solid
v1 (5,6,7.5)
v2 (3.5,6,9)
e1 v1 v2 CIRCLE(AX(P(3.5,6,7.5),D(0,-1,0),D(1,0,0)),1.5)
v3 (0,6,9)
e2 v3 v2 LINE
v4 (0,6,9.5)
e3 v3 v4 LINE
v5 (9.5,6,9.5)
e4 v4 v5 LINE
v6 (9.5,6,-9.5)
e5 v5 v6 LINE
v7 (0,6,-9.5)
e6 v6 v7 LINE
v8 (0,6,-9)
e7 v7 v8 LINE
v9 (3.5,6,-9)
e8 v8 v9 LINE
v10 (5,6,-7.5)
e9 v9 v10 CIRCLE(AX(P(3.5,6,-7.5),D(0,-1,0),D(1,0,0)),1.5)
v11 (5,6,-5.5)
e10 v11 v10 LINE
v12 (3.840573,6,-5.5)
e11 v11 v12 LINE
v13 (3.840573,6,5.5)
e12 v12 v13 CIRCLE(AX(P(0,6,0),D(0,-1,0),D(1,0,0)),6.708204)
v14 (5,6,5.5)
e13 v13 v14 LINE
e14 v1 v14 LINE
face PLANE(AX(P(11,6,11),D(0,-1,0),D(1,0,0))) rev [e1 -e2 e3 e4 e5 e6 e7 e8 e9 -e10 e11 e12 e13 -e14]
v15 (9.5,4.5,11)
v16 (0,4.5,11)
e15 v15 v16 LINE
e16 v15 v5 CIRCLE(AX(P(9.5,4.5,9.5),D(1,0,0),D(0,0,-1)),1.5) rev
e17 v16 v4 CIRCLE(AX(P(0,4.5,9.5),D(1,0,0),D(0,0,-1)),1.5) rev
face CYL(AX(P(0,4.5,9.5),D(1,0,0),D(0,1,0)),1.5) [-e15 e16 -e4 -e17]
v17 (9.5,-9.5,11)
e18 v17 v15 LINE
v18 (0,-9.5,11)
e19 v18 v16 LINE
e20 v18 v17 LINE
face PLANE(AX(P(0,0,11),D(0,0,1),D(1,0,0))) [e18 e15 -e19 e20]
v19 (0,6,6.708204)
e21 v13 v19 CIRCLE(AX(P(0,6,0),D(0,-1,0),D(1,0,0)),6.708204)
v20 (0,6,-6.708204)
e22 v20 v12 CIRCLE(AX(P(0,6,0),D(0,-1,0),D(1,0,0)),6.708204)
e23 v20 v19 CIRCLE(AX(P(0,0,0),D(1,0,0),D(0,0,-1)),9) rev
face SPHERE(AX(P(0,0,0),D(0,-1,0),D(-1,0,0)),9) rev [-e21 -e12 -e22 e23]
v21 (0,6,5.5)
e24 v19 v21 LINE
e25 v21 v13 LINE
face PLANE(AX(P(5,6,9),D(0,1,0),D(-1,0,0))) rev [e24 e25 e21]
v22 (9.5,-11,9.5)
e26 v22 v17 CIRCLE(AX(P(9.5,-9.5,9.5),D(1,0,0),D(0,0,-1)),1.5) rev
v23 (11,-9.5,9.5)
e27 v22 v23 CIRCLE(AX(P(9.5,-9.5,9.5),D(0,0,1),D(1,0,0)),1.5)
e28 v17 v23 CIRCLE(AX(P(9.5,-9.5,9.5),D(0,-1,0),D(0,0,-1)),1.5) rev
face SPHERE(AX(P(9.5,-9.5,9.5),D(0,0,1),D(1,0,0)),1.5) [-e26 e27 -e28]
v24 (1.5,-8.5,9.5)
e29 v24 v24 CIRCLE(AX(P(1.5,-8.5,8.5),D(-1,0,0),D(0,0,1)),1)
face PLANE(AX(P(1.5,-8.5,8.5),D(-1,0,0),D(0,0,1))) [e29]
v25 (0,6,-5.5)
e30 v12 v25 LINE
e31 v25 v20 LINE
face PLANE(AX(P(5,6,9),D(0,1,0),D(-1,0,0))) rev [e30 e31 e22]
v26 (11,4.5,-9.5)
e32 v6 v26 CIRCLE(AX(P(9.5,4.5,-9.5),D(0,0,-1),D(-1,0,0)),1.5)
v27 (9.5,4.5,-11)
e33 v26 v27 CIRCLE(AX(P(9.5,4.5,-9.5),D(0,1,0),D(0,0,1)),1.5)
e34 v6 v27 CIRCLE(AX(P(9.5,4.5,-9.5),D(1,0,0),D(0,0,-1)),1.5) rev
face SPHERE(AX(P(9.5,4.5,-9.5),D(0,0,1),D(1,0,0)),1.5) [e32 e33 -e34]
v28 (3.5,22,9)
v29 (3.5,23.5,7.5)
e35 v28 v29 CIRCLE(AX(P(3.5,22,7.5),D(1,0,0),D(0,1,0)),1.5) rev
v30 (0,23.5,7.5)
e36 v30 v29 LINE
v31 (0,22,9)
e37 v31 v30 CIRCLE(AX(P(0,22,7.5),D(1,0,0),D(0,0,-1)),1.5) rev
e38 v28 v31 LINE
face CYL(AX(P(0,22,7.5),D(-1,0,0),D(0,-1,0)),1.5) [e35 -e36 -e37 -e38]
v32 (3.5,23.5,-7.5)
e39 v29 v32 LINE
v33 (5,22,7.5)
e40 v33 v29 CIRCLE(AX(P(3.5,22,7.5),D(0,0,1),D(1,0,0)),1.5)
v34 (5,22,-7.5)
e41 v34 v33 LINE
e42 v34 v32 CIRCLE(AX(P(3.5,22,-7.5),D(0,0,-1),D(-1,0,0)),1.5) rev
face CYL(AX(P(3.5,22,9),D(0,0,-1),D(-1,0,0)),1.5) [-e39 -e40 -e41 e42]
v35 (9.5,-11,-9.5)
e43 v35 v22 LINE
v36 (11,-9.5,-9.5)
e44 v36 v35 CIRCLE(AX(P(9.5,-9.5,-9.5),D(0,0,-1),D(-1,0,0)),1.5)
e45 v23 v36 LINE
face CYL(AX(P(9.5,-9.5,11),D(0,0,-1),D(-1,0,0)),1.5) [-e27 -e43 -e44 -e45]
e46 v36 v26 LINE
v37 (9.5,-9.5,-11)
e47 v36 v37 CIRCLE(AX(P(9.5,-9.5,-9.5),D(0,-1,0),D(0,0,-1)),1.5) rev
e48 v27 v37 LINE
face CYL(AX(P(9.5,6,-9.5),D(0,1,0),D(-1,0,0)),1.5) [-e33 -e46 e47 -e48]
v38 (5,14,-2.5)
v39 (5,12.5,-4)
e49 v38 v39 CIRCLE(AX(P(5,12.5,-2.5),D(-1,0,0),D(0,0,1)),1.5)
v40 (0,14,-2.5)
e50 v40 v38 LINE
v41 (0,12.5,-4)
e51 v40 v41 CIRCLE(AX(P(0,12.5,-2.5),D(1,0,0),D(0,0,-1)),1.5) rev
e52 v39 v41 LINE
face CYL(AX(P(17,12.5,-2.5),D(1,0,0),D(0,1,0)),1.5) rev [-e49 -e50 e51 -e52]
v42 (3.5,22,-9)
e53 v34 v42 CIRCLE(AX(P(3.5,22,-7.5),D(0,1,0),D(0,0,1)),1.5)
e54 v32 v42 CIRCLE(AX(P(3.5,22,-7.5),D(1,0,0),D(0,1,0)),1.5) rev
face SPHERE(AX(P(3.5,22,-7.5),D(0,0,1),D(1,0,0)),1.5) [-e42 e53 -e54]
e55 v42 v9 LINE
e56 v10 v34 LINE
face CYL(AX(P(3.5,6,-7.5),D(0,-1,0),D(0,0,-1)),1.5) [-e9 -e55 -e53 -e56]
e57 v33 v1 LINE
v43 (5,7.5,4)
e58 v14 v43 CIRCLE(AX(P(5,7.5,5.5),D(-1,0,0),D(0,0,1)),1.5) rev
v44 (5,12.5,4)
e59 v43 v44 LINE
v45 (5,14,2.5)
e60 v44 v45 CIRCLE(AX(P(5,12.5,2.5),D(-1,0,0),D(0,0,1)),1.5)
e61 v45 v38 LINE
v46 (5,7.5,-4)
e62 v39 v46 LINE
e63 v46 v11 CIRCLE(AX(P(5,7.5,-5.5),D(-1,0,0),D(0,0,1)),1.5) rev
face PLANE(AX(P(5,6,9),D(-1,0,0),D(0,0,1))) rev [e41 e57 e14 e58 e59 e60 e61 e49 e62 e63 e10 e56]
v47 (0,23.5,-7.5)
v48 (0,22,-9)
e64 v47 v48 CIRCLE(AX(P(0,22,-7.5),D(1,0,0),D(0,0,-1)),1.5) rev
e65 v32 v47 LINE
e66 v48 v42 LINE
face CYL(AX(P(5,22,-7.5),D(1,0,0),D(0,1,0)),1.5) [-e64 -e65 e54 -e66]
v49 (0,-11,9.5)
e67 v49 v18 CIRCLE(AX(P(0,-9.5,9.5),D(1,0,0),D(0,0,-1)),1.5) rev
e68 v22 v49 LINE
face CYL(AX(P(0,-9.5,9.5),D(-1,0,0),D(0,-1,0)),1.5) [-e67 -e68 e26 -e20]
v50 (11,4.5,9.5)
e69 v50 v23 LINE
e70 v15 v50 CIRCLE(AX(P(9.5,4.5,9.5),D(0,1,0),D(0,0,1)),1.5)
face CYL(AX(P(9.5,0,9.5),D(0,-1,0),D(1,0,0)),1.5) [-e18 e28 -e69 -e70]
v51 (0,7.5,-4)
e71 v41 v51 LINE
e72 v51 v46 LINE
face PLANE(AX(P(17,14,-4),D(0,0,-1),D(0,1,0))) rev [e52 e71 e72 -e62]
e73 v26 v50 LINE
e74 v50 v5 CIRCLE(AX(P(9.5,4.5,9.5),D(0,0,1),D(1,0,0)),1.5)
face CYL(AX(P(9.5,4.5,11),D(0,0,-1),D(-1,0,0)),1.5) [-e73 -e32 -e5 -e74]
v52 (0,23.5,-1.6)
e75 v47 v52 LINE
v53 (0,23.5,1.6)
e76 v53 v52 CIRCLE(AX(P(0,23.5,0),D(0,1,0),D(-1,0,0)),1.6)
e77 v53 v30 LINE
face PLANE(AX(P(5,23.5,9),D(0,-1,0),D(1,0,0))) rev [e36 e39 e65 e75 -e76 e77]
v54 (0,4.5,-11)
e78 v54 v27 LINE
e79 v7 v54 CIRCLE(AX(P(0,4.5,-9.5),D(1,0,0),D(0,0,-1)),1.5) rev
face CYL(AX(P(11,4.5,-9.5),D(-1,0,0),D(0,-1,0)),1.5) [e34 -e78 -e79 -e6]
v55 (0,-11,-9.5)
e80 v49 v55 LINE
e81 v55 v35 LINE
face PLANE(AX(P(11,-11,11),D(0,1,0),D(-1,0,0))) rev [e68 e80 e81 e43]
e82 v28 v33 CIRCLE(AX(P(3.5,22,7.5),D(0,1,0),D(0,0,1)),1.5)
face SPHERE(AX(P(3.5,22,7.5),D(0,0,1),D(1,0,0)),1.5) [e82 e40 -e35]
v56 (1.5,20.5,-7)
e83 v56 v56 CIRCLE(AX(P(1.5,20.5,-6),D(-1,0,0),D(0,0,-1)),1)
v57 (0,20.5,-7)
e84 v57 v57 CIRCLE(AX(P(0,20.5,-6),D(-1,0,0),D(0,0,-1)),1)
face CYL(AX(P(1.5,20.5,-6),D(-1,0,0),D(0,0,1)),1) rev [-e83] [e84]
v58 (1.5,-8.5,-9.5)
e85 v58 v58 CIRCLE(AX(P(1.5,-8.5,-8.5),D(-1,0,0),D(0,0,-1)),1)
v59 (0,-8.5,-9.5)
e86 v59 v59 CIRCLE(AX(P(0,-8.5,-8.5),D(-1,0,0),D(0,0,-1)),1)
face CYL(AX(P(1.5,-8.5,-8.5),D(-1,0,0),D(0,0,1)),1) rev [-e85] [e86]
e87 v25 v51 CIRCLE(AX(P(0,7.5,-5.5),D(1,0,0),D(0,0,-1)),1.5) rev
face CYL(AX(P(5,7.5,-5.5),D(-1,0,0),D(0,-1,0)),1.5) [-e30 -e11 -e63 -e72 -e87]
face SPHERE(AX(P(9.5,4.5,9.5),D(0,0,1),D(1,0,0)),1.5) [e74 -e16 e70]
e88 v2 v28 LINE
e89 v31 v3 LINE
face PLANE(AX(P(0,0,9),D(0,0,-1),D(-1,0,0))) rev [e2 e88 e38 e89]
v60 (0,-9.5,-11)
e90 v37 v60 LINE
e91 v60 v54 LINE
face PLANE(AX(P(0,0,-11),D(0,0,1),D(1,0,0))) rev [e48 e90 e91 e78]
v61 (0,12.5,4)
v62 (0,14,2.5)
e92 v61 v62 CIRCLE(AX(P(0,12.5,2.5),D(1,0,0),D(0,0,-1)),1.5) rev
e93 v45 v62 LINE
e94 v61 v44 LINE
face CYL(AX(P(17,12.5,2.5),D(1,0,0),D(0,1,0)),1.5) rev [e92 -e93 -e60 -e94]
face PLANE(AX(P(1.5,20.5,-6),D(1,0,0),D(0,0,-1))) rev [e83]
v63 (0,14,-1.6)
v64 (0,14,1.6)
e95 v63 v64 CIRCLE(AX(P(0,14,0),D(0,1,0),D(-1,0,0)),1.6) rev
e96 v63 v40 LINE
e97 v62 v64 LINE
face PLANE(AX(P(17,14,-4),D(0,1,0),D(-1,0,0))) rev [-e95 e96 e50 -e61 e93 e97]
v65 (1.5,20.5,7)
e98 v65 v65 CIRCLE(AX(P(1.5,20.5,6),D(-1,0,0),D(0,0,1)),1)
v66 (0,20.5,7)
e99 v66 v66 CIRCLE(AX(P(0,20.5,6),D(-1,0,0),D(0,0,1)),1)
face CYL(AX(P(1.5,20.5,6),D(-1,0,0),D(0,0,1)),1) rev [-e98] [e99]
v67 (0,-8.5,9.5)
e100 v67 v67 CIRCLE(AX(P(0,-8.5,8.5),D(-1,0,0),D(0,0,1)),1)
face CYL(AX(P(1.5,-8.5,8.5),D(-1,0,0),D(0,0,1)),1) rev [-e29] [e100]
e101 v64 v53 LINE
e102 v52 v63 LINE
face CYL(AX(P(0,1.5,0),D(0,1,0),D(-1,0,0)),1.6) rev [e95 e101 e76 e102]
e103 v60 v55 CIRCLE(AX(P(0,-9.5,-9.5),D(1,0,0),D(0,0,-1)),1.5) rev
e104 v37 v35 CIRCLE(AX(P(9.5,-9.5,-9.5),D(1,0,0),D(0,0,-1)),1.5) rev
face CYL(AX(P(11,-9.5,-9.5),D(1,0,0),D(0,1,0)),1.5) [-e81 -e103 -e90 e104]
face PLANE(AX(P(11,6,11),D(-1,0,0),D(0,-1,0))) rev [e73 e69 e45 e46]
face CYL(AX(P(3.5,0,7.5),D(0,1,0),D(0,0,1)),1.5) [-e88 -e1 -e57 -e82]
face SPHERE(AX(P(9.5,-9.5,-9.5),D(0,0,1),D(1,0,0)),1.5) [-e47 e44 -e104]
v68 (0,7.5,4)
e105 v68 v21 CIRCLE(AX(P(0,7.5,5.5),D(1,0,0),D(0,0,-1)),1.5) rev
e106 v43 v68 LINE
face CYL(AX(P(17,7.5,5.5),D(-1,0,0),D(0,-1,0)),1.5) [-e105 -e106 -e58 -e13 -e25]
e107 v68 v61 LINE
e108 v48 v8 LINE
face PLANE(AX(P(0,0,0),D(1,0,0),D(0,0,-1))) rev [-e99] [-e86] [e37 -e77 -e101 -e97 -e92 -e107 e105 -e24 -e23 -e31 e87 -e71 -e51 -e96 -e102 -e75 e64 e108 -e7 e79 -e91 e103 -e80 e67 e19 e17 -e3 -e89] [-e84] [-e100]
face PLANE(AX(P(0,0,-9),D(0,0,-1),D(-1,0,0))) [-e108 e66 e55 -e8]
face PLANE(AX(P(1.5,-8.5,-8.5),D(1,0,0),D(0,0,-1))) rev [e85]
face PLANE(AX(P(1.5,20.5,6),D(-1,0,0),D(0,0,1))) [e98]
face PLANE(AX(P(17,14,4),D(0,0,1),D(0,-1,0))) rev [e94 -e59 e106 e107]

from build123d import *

# Parameters (mm, degrees)
SKETCH_1_W          = 22
SKETCH_1_H          = 17
EXTRUDE_1_DEPTH     = 11
SKETCH_3_W          = 10
SKETCH_3_H          = 17.5
EXTRUDE_2_DEPTH     = 9
SKETCH_4_R          = 1.6
CUT_EXTRUDE_1_DEPTH = 22
SKETCH_5_W          = 8
SKETCH_5_H          = 8
CUT_EXTRUDE_2_DEPTH = 22
FILLET_1_R          = 1.5
FILLET_START        = -6
FILLET_2_DEPTH      = 11
FILLET_START_2      = -5
FILLET_2_2_DEPTH    = 10
SKETCH_7_W          = 37.569031752
SKETCH_7_H          = 53.082934042
CUT_EXTRUDE_4_DEPTH = 22
SKETCH_8_R          = 1
CUT_EXTRUDE_5_DEPTH = 1.5


with BuildPart() as part:
    # 草图1 → 凸台-拉伸1 (new, symmetric)
    with BuildSketch(Plane.XY):
        with Locations((0, -2.5)):
            Rectangle(SKETCH_1_W, SKETCH_1_H)
    extrude(amount=EXTRUDE_1_DEPTH, both=True)

    # 草图2 → 切除-旋转1 (revolve, cut)
    with BuildSketch(Plane.XY, mode=Mode.PRIVATE) as cut_revolve_1_sk:
        with BuildLine():
            Line((0, 6), (6.708203932, 6))
            ThreePointArc((6.708203932, 6), (8.215838363, -3.674234614), (0, -9))
            Line((0, -9), (0, 6))
        make_face()
    revolve(cut_revolve_1_sk.sketch.rotate(Axis((0, 0, 0), (0, 1, 0)), 180), axis=Axis((0, 0, 0), (0, 1, 0)), mode=Mode.SUBTRACT)

    # 草图3 → 凸台-拉伸2 (add, symmetric)
    with BuildSketch(Plane.XY):
        with Locations((0, 14.75)):
            Rectangle(SKETCH_3_W, SKETCH_3_H)
    extrude(amount=EXTRUDE_2_DEPTH, both=True)

    # 草图4 → 切除-拉伸1 (cut)
    with BuildSketch(Plane(origin=(0, 23.5, 0), x_dir=(1, 0, 0), z_dir=(0, 1, 0))):
        with Locations(Location((0, 0, 0), (0, 0, 180))):
            Circle(SKETCH_4_R)
    extrude(amount=-CUT_EXTRUDE_1_DEPTH, mode=Mode.SUBTRACT)

    # 草图5 → 切除-拉伸2 (cut)
    with BuildSketch(Plane.ZY.offset(5)):
        with Locations((0, 10)):
            Rectangle(SKETCH_5_W, SKETCH_5_H)
    extrude(amount=-CUT_EXTRUDE_2_DEPTH, mode=Mode.SUBTRACT)

    # 圆角1
    fillet_1_edges = [part.edges().sort_by_distance(p)[0] for p in [
        (0, -11, 11),
        (11, -2.5, 11),
        (5, 14.75, -9),
        (0, 23.5, -9),
        (5, 23.5, 0),
        (-5, 14.75, -9),
        (-5, 23.5, 0),
        (5, 14.75, 9),
        (0, 23.5, 9),
        (-5, 14.75, 9),
        (0, 6, 11),
        (11, -2.5, -11),
        (0, -11, -11),
        (-11, -2.5, -11),
        (0, 6, -11),
        (11, 6, 0),
        (11, -11, 0),
        (-11, -11, 0),
        (-11, 6, 0),
        (-11, -2.5, 11),
    ]]
    fillet(fillet_1_edges, radius=FILLET_1_R)

    # 圆角2: read off the stored shape, not the designer's step
    # 圆角2 outline → 圆角2 (cut)
    with BuildSketch(Plane.YZ.offset(FILLET_START)):
        with BuildLine():
            Line((6, -4), (6, -5.5))
            ThreePointArc((6, -5.5), (6.439339828, -4.439339828), (7.5, -4))
            Line((7.5, -4), (6, -4))
        make_face()
        with BuildLine():
            Line((6, 4), (7.5, 4))
            ThreePointArc((7.5, 4), (6.439339828, 4.439339828), (6, 5.5))
            Line((6, 5.5), (6, 4))
        make_face()
    extrude(amount=FILLET_2_DEPTH, mode=Mode.SUBTRACT)

    # Fillet 2 2 outline → Fillet 2 2 (add)
    with BuildSketch(Plane.YZ.offset(FILLET_START_2)):
        with BuildLine():
            ThreePointArc((12.5, 4), (13.560660172, 3.560660172), (14, 2.5))
            Line((14, 2.5), (14, 4))
            Line((14, 4), (12.5, 4))
        make_face()
        with BuildLine():
            ThreePointArc((14, -2.5), (13.560660172, -3.560660172), (12.5, -4))
            Line((12.5, -4), (14, -4))
            Line((14, -4), (14, -2.5))
        make_face()
    extrude(amount=FILLET_2_2_DEPTH)

    # 草图7 → 切除-拉伸4 (cut)
    with BuildSketch(Plane(origin=(0, 0, 0), x_dir=(0, 0, -1), z_dir=(1, 0, 0))):
        Rectangle(SKETCH_7_W, SKETCH_7_H)
    extrude(amount=-CUT_EXTRUDE_4_DEPTH, mode=Mode.SUBTRACT)

    # 草图8 → 切除-拉伸5 (cut)
    with BuildSketch(Plane.ZY):
        with Locations((6, 20.5)):
            Circle(SKETCH_8_R)
        with Locations((8.5, -8.5)):
            Circle(SKETCH_8_R)
        with Locations(Location((-6, 20.5, 0), (0, 0, 180))):
            Circle(SKETCH_8_R)
        with Locations(Location((-8.5, -8.5, 0), (0, 0, 180))):
            Circle(SKETCH_8_R)
    extrude(amount=-CUT_EXTRUDE_5_DEPTH, mode=Mode.SUBTRACT)


solid = part.part
